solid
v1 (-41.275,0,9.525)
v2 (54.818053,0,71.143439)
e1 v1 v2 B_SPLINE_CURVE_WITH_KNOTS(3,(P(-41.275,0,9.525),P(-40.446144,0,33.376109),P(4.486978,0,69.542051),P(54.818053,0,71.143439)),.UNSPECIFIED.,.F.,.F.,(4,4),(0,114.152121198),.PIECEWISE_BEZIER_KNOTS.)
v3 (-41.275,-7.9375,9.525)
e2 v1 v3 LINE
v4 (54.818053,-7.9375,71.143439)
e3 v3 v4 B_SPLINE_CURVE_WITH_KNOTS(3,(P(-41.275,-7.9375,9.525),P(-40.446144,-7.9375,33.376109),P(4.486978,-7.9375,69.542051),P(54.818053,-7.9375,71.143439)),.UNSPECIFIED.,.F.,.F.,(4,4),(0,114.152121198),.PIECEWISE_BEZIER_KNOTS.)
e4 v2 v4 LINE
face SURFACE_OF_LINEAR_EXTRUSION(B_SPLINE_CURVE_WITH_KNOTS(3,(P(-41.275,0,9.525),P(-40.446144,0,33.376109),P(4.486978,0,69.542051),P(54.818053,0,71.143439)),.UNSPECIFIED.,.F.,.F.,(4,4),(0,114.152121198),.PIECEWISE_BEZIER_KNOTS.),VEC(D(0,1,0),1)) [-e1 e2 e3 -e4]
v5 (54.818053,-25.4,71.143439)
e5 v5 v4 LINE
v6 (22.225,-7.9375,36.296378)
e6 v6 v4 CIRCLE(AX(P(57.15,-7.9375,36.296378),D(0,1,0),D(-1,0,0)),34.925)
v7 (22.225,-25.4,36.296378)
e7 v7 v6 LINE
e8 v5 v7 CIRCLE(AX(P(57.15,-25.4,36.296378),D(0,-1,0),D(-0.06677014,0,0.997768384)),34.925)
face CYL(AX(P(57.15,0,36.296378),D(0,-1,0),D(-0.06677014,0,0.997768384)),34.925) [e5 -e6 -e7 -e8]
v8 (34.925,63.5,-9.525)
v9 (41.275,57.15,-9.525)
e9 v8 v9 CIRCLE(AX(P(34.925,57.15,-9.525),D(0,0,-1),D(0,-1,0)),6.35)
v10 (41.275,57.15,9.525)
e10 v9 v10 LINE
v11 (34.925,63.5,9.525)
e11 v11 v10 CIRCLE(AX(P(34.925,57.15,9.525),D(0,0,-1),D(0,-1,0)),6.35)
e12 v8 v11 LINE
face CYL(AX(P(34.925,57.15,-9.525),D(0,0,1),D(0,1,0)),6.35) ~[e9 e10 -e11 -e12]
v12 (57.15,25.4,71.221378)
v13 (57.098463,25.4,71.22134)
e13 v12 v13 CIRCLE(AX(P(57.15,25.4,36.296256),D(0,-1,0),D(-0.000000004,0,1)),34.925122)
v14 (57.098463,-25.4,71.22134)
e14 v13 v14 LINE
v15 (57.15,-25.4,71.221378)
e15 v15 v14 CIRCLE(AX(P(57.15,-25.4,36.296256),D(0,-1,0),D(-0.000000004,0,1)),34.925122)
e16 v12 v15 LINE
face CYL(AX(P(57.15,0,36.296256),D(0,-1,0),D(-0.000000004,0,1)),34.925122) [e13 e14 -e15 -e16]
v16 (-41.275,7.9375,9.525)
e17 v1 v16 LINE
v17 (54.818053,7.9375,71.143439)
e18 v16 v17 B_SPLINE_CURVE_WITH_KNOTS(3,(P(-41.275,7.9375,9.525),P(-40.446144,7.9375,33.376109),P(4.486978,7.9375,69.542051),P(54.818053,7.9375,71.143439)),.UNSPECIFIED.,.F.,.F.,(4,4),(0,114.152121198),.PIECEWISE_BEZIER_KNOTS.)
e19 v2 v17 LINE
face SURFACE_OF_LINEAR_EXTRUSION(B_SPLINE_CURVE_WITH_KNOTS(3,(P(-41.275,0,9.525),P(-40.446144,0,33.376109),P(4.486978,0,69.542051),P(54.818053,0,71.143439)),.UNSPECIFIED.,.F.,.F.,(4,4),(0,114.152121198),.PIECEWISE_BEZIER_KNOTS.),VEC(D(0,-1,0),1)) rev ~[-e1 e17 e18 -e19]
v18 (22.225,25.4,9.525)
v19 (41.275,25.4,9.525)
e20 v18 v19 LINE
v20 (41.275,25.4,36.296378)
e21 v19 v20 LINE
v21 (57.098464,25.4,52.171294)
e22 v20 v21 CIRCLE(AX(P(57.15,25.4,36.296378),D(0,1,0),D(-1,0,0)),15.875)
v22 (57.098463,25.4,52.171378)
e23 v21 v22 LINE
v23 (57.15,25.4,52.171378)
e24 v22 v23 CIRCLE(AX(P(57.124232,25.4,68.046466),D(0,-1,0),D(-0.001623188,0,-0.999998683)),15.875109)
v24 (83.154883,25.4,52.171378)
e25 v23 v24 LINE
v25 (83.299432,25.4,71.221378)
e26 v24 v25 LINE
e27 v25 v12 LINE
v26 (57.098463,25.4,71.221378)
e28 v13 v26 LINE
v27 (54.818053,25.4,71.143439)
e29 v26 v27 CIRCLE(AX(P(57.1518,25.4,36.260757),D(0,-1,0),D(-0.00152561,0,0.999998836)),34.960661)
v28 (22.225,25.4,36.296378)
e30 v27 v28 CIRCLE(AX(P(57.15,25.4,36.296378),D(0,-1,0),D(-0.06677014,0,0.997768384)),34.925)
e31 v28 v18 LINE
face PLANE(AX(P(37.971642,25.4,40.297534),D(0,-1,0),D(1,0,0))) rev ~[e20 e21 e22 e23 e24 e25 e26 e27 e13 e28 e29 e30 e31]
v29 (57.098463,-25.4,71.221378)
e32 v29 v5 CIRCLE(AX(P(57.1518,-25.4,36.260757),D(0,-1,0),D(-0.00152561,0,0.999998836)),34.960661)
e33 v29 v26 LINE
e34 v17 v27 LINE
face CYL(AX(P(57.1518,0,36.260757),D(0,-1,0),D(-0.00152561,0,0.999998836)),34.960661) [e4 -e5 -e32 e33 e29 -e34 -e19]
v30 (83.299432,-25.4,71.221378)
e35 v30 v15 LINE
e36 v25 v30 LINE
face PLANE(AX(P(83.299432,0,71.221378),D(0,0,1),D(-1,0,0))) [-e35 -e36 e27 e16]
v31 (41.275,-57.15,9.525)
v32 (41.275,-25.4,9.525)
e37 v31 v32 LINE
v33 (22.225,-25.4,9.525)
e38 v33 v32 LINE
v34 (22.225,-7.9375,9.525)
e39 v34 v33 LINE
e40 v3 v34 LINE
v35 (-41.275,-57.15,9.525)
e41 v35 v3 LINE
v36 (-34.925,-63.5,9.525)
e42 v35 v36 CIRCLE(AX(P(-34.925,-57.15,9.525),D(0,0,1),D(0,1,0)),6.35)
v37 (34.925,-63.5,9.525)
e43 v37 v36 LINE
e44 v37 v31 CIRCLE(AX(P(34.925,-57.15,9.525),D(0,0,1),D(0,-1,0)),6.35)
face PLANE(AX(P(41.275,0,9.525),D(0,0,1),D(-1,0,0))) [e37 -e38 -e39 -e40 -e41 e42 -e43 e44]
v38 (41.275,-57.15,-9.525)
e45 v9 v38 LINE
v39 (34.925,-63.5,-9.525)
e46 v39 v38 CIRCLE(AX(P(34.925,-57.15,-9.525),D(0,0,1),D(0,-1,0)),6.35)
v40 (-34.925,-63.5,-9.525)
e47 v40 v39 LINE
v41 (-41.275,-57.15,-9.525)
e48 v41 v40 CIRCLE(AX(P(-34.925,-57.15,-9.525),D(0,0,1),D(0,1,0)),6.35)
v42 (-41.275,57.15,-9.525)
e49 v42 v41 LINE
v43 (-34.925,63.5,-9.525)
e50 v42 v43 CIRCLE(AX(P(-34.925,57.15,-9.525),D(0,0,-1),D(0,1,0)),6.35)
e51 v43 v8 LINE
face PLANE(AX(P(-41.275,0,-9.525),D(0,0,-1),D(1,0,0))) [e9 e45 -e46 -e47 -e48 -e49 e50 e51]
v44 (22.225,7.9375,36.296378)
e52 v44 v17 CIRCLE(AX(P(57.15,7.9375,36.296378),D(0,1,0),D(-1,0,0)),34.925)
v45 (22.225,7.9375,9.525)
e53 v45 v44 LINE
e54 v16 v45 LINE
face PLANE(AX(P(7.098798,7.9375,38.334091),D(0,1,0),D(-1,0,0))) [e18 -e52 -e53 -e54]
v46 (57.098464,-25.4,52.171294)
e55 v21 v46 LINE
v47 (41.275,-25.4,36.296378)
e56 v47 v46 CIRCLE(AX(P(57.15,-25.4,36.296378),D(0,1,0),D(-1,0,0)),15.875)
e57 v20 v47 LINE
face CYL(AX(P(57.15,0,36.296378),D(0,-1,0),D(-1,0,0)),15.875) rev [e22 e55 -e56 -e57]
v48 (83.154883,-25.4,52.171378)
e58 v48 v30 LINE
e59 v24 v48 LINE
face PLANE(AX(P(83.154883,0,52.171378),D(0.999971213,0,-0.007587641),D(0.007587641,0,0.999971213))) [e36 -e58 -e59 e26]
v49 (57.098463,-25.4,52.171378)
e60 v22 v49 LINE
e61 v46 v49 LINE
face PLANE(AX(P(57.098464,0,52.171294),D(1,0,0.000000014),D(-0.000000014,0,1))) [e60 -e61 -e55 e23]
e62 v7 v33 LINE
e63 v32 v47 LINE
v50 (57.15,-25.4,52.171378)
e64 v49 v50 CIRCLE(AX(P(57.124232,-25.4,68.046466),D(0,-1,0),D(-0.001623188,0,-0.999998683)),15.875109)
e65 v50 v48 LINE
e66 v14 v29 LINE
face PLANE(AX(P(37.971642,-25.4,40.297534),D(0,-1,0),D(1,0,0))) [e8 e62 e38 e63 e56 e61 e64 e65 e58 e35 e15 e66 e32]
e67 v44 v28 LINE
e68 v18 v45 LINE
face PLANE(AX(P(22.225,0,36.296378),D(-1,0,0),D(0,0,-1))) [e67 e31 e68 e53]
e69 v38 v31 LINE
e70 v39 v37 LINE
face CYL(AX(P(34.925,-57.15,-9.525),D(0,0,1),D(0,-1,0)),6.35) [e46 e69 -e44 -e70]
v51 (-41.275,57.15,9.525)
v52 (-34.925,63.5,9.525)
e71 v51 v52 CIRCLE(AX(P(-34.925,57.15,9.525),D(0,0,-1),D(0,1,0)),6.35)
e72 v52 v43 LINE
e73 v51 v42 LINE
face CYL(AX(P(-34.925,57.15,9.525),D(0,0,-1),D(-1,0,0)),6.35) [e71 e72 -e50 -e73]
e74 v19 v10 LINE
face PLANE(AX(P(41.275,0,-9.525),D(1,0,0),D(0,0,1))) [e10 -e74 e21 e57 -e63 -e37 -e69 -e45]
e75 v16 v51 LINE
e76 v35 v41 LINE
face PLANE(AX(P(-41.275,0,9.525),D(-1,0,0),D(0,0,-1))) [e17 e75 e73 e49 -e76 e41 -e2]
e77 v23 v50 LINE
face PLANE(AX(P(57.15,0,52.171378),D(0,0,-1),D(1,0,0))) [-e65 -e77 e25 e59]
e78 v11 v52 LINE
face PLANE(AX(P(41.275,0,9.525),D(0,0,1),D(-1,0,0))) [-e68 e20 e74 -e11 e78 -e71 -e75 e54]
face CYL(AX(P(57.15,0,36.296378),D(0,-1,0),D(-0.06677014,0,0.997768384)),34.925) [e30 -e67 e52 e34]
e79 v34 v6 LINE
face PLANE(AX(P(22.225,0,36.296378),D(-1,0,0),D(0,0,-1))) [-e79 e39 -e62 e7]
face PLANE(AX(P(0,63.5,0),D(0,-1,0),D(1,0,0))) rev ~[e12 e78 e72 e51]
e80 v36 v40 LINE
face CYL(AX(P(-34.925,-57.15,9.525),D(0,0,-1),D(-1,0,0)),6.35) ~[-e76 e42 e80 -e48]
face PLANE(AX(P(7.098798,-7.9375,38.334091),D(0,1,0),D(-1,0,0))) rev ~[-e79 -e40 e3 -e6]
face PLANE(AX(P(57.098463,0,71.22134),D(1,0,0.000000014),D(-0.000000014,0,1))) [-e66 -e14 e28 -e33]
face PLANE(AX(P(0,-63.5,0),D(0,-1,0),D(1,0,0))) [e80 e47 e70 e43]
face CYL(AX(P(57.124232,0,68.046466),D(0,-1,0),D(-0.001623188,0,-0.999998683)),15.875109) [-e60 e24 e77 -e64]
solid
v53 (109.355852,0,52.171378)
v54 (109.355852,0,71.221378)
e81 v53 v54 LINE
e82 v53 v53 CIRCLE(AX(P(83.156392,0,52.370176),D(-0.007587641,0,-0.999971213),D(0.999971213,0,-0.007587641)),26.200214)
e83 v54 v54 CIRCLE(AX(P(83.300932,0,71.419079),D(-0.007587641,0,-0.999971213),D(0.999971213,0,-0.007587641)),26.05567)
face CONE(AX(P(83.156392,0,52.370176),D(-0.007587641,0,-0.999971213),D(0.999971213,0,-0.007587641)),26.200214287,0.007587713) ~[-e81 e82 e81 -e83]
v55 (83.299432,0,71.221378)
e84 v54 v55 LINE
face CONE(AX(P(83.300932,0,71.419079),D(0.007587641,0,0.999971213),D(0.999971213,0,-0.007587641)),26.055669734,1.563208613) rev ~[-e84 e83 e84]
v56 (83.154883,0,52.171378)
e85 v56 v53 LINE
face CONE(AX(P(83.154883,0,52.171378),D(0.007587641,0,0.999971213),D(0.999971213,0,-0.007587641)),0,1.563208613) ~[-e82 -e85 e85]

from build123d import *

# Parameters (mm, degrees)
F1_DEPTH = 63.5
F2_DEPTH = 25.4
F3_DEPTH = 7.9375
F5_R     = 6.35


# Not quite as in the source:
# - ends of sketch curves that miss each other by under 0.0002 mm in the source are joined


with BuildPart() as f1:
    # F0 (on Front) → F1 (new body, symmetric)
    with BuildSketch(Plane.XZ):
        Polygon((22.225, 9.525), (-41.275, 9.525), (-41.275, -9.525), (41.275, -9.525), (41.275, 9.525), align=None)
    extrude(amount=F1_DEPTH, both=True)

    # F0 (on Front) → F2 (join, symmetric)
    with BuildSketch(Plane.XZ):
        with BuildLine():
            Line((22.225, 36.2963777006), (22.225, 9.525))
            Line((22.225, 9.525), (41.275, 9.525))
            Line((41.275, 9.525), (41.275, 36.2963777006))
            ThreePointArc((41.275, 36.2963777006), (45.9064737786, 47.5034622059), (57.0984636988, 52.1712940471))
            Line((57.0984636988, 52.1712940471), (57.0984634272, 71.2213777006))
            ThreePointArc((57.0984634272, 71.2213777006), (55.9576218184, 71.2010172098), (54.8180528643, 71.1434385172))
            ThreePointArc((54.8180528643, 71.1434385172), (31.6431491682, 60.1533721811), (22.225, 36.2963777006))
        make_face()
        with BuildLine():
            ThreePointArc((57.15, 71.2213777006), (57.1242317347, 71.2213681944), (57.0984634834, 71.221339676))
            Line((57.0984634834, 71.221339676), (57.0984634272, 52.1713777006))
            ThreePointArc((57.0984634272, 52.1713777006), (57.1242318155, 52.1713567872), (57.15, 52.1713777006))
            Line((57.15, 52.1713777006), (83.1548832357, 52.1713777006))
            Line((83.1548832357, 52.1713777006), (83.2994319499, 71.2213777006))
            Line((83.2994319499, 71.2213777006), (57.15, 71.2213777006))
        make_face()
    extrude(amount=F2_DEPTH, both=True)

    # F0 (on Front) → F3 (join, symmetric)
    with BuildSketch(Plane.XZ):
        with BuildLine():
            add(Edge.make_bspline(
                [(-41.275, 9.525), (-40.4461435974, 33.376108855), (4.4869781457, 69.5420511852), (54.8180528643, 71.1434385172)],
                knots=[0, 0, 0, 0, 114.1521211983, 114.1521211983, 114.1521211983, 114.1521211983], degree=3))
            Line((-41.275, 9.525), (22.225, 9.525))
            Line((22.225, 9.525), (22.225, 36.2963777006))
            ThreePointArc((22.225, 36.2963777006), (31.6431491682, 60.1533721811), (54.8180528643, 71.1434385172))
        make_face()
    extrude(amount=F3_DEPTH, both=True)

    # F5
    f5_edges = [f1.edges().sort_by_distance(p)[0] for p in [
        (41.275, -63.5, 0),
        (-41.275, -63.5, 0),
        (41.275, 63.5, 0),
        (-41.275, 63.5, 0),
    ]]
    fillet(f5_edges, radius=F5_R)


with BuildPart() as f4:
    # F0 (on Front) → F4 (revolve)
    with BuildSketch(Plane.XZ):
        Polygon((109.3558517583, 71.2213777006), (83.2994319499, 71.2213777006), (83.1548832357, 52.1713777006), (109.3558517583, 52.1713777006), align=None)
    revolve(axis=Axis((83.2271575928, 0, 61.6963777006), (-0.0075876406, 0, -0.9999712134)))


solid = Compound([f1.part, f4.part])
